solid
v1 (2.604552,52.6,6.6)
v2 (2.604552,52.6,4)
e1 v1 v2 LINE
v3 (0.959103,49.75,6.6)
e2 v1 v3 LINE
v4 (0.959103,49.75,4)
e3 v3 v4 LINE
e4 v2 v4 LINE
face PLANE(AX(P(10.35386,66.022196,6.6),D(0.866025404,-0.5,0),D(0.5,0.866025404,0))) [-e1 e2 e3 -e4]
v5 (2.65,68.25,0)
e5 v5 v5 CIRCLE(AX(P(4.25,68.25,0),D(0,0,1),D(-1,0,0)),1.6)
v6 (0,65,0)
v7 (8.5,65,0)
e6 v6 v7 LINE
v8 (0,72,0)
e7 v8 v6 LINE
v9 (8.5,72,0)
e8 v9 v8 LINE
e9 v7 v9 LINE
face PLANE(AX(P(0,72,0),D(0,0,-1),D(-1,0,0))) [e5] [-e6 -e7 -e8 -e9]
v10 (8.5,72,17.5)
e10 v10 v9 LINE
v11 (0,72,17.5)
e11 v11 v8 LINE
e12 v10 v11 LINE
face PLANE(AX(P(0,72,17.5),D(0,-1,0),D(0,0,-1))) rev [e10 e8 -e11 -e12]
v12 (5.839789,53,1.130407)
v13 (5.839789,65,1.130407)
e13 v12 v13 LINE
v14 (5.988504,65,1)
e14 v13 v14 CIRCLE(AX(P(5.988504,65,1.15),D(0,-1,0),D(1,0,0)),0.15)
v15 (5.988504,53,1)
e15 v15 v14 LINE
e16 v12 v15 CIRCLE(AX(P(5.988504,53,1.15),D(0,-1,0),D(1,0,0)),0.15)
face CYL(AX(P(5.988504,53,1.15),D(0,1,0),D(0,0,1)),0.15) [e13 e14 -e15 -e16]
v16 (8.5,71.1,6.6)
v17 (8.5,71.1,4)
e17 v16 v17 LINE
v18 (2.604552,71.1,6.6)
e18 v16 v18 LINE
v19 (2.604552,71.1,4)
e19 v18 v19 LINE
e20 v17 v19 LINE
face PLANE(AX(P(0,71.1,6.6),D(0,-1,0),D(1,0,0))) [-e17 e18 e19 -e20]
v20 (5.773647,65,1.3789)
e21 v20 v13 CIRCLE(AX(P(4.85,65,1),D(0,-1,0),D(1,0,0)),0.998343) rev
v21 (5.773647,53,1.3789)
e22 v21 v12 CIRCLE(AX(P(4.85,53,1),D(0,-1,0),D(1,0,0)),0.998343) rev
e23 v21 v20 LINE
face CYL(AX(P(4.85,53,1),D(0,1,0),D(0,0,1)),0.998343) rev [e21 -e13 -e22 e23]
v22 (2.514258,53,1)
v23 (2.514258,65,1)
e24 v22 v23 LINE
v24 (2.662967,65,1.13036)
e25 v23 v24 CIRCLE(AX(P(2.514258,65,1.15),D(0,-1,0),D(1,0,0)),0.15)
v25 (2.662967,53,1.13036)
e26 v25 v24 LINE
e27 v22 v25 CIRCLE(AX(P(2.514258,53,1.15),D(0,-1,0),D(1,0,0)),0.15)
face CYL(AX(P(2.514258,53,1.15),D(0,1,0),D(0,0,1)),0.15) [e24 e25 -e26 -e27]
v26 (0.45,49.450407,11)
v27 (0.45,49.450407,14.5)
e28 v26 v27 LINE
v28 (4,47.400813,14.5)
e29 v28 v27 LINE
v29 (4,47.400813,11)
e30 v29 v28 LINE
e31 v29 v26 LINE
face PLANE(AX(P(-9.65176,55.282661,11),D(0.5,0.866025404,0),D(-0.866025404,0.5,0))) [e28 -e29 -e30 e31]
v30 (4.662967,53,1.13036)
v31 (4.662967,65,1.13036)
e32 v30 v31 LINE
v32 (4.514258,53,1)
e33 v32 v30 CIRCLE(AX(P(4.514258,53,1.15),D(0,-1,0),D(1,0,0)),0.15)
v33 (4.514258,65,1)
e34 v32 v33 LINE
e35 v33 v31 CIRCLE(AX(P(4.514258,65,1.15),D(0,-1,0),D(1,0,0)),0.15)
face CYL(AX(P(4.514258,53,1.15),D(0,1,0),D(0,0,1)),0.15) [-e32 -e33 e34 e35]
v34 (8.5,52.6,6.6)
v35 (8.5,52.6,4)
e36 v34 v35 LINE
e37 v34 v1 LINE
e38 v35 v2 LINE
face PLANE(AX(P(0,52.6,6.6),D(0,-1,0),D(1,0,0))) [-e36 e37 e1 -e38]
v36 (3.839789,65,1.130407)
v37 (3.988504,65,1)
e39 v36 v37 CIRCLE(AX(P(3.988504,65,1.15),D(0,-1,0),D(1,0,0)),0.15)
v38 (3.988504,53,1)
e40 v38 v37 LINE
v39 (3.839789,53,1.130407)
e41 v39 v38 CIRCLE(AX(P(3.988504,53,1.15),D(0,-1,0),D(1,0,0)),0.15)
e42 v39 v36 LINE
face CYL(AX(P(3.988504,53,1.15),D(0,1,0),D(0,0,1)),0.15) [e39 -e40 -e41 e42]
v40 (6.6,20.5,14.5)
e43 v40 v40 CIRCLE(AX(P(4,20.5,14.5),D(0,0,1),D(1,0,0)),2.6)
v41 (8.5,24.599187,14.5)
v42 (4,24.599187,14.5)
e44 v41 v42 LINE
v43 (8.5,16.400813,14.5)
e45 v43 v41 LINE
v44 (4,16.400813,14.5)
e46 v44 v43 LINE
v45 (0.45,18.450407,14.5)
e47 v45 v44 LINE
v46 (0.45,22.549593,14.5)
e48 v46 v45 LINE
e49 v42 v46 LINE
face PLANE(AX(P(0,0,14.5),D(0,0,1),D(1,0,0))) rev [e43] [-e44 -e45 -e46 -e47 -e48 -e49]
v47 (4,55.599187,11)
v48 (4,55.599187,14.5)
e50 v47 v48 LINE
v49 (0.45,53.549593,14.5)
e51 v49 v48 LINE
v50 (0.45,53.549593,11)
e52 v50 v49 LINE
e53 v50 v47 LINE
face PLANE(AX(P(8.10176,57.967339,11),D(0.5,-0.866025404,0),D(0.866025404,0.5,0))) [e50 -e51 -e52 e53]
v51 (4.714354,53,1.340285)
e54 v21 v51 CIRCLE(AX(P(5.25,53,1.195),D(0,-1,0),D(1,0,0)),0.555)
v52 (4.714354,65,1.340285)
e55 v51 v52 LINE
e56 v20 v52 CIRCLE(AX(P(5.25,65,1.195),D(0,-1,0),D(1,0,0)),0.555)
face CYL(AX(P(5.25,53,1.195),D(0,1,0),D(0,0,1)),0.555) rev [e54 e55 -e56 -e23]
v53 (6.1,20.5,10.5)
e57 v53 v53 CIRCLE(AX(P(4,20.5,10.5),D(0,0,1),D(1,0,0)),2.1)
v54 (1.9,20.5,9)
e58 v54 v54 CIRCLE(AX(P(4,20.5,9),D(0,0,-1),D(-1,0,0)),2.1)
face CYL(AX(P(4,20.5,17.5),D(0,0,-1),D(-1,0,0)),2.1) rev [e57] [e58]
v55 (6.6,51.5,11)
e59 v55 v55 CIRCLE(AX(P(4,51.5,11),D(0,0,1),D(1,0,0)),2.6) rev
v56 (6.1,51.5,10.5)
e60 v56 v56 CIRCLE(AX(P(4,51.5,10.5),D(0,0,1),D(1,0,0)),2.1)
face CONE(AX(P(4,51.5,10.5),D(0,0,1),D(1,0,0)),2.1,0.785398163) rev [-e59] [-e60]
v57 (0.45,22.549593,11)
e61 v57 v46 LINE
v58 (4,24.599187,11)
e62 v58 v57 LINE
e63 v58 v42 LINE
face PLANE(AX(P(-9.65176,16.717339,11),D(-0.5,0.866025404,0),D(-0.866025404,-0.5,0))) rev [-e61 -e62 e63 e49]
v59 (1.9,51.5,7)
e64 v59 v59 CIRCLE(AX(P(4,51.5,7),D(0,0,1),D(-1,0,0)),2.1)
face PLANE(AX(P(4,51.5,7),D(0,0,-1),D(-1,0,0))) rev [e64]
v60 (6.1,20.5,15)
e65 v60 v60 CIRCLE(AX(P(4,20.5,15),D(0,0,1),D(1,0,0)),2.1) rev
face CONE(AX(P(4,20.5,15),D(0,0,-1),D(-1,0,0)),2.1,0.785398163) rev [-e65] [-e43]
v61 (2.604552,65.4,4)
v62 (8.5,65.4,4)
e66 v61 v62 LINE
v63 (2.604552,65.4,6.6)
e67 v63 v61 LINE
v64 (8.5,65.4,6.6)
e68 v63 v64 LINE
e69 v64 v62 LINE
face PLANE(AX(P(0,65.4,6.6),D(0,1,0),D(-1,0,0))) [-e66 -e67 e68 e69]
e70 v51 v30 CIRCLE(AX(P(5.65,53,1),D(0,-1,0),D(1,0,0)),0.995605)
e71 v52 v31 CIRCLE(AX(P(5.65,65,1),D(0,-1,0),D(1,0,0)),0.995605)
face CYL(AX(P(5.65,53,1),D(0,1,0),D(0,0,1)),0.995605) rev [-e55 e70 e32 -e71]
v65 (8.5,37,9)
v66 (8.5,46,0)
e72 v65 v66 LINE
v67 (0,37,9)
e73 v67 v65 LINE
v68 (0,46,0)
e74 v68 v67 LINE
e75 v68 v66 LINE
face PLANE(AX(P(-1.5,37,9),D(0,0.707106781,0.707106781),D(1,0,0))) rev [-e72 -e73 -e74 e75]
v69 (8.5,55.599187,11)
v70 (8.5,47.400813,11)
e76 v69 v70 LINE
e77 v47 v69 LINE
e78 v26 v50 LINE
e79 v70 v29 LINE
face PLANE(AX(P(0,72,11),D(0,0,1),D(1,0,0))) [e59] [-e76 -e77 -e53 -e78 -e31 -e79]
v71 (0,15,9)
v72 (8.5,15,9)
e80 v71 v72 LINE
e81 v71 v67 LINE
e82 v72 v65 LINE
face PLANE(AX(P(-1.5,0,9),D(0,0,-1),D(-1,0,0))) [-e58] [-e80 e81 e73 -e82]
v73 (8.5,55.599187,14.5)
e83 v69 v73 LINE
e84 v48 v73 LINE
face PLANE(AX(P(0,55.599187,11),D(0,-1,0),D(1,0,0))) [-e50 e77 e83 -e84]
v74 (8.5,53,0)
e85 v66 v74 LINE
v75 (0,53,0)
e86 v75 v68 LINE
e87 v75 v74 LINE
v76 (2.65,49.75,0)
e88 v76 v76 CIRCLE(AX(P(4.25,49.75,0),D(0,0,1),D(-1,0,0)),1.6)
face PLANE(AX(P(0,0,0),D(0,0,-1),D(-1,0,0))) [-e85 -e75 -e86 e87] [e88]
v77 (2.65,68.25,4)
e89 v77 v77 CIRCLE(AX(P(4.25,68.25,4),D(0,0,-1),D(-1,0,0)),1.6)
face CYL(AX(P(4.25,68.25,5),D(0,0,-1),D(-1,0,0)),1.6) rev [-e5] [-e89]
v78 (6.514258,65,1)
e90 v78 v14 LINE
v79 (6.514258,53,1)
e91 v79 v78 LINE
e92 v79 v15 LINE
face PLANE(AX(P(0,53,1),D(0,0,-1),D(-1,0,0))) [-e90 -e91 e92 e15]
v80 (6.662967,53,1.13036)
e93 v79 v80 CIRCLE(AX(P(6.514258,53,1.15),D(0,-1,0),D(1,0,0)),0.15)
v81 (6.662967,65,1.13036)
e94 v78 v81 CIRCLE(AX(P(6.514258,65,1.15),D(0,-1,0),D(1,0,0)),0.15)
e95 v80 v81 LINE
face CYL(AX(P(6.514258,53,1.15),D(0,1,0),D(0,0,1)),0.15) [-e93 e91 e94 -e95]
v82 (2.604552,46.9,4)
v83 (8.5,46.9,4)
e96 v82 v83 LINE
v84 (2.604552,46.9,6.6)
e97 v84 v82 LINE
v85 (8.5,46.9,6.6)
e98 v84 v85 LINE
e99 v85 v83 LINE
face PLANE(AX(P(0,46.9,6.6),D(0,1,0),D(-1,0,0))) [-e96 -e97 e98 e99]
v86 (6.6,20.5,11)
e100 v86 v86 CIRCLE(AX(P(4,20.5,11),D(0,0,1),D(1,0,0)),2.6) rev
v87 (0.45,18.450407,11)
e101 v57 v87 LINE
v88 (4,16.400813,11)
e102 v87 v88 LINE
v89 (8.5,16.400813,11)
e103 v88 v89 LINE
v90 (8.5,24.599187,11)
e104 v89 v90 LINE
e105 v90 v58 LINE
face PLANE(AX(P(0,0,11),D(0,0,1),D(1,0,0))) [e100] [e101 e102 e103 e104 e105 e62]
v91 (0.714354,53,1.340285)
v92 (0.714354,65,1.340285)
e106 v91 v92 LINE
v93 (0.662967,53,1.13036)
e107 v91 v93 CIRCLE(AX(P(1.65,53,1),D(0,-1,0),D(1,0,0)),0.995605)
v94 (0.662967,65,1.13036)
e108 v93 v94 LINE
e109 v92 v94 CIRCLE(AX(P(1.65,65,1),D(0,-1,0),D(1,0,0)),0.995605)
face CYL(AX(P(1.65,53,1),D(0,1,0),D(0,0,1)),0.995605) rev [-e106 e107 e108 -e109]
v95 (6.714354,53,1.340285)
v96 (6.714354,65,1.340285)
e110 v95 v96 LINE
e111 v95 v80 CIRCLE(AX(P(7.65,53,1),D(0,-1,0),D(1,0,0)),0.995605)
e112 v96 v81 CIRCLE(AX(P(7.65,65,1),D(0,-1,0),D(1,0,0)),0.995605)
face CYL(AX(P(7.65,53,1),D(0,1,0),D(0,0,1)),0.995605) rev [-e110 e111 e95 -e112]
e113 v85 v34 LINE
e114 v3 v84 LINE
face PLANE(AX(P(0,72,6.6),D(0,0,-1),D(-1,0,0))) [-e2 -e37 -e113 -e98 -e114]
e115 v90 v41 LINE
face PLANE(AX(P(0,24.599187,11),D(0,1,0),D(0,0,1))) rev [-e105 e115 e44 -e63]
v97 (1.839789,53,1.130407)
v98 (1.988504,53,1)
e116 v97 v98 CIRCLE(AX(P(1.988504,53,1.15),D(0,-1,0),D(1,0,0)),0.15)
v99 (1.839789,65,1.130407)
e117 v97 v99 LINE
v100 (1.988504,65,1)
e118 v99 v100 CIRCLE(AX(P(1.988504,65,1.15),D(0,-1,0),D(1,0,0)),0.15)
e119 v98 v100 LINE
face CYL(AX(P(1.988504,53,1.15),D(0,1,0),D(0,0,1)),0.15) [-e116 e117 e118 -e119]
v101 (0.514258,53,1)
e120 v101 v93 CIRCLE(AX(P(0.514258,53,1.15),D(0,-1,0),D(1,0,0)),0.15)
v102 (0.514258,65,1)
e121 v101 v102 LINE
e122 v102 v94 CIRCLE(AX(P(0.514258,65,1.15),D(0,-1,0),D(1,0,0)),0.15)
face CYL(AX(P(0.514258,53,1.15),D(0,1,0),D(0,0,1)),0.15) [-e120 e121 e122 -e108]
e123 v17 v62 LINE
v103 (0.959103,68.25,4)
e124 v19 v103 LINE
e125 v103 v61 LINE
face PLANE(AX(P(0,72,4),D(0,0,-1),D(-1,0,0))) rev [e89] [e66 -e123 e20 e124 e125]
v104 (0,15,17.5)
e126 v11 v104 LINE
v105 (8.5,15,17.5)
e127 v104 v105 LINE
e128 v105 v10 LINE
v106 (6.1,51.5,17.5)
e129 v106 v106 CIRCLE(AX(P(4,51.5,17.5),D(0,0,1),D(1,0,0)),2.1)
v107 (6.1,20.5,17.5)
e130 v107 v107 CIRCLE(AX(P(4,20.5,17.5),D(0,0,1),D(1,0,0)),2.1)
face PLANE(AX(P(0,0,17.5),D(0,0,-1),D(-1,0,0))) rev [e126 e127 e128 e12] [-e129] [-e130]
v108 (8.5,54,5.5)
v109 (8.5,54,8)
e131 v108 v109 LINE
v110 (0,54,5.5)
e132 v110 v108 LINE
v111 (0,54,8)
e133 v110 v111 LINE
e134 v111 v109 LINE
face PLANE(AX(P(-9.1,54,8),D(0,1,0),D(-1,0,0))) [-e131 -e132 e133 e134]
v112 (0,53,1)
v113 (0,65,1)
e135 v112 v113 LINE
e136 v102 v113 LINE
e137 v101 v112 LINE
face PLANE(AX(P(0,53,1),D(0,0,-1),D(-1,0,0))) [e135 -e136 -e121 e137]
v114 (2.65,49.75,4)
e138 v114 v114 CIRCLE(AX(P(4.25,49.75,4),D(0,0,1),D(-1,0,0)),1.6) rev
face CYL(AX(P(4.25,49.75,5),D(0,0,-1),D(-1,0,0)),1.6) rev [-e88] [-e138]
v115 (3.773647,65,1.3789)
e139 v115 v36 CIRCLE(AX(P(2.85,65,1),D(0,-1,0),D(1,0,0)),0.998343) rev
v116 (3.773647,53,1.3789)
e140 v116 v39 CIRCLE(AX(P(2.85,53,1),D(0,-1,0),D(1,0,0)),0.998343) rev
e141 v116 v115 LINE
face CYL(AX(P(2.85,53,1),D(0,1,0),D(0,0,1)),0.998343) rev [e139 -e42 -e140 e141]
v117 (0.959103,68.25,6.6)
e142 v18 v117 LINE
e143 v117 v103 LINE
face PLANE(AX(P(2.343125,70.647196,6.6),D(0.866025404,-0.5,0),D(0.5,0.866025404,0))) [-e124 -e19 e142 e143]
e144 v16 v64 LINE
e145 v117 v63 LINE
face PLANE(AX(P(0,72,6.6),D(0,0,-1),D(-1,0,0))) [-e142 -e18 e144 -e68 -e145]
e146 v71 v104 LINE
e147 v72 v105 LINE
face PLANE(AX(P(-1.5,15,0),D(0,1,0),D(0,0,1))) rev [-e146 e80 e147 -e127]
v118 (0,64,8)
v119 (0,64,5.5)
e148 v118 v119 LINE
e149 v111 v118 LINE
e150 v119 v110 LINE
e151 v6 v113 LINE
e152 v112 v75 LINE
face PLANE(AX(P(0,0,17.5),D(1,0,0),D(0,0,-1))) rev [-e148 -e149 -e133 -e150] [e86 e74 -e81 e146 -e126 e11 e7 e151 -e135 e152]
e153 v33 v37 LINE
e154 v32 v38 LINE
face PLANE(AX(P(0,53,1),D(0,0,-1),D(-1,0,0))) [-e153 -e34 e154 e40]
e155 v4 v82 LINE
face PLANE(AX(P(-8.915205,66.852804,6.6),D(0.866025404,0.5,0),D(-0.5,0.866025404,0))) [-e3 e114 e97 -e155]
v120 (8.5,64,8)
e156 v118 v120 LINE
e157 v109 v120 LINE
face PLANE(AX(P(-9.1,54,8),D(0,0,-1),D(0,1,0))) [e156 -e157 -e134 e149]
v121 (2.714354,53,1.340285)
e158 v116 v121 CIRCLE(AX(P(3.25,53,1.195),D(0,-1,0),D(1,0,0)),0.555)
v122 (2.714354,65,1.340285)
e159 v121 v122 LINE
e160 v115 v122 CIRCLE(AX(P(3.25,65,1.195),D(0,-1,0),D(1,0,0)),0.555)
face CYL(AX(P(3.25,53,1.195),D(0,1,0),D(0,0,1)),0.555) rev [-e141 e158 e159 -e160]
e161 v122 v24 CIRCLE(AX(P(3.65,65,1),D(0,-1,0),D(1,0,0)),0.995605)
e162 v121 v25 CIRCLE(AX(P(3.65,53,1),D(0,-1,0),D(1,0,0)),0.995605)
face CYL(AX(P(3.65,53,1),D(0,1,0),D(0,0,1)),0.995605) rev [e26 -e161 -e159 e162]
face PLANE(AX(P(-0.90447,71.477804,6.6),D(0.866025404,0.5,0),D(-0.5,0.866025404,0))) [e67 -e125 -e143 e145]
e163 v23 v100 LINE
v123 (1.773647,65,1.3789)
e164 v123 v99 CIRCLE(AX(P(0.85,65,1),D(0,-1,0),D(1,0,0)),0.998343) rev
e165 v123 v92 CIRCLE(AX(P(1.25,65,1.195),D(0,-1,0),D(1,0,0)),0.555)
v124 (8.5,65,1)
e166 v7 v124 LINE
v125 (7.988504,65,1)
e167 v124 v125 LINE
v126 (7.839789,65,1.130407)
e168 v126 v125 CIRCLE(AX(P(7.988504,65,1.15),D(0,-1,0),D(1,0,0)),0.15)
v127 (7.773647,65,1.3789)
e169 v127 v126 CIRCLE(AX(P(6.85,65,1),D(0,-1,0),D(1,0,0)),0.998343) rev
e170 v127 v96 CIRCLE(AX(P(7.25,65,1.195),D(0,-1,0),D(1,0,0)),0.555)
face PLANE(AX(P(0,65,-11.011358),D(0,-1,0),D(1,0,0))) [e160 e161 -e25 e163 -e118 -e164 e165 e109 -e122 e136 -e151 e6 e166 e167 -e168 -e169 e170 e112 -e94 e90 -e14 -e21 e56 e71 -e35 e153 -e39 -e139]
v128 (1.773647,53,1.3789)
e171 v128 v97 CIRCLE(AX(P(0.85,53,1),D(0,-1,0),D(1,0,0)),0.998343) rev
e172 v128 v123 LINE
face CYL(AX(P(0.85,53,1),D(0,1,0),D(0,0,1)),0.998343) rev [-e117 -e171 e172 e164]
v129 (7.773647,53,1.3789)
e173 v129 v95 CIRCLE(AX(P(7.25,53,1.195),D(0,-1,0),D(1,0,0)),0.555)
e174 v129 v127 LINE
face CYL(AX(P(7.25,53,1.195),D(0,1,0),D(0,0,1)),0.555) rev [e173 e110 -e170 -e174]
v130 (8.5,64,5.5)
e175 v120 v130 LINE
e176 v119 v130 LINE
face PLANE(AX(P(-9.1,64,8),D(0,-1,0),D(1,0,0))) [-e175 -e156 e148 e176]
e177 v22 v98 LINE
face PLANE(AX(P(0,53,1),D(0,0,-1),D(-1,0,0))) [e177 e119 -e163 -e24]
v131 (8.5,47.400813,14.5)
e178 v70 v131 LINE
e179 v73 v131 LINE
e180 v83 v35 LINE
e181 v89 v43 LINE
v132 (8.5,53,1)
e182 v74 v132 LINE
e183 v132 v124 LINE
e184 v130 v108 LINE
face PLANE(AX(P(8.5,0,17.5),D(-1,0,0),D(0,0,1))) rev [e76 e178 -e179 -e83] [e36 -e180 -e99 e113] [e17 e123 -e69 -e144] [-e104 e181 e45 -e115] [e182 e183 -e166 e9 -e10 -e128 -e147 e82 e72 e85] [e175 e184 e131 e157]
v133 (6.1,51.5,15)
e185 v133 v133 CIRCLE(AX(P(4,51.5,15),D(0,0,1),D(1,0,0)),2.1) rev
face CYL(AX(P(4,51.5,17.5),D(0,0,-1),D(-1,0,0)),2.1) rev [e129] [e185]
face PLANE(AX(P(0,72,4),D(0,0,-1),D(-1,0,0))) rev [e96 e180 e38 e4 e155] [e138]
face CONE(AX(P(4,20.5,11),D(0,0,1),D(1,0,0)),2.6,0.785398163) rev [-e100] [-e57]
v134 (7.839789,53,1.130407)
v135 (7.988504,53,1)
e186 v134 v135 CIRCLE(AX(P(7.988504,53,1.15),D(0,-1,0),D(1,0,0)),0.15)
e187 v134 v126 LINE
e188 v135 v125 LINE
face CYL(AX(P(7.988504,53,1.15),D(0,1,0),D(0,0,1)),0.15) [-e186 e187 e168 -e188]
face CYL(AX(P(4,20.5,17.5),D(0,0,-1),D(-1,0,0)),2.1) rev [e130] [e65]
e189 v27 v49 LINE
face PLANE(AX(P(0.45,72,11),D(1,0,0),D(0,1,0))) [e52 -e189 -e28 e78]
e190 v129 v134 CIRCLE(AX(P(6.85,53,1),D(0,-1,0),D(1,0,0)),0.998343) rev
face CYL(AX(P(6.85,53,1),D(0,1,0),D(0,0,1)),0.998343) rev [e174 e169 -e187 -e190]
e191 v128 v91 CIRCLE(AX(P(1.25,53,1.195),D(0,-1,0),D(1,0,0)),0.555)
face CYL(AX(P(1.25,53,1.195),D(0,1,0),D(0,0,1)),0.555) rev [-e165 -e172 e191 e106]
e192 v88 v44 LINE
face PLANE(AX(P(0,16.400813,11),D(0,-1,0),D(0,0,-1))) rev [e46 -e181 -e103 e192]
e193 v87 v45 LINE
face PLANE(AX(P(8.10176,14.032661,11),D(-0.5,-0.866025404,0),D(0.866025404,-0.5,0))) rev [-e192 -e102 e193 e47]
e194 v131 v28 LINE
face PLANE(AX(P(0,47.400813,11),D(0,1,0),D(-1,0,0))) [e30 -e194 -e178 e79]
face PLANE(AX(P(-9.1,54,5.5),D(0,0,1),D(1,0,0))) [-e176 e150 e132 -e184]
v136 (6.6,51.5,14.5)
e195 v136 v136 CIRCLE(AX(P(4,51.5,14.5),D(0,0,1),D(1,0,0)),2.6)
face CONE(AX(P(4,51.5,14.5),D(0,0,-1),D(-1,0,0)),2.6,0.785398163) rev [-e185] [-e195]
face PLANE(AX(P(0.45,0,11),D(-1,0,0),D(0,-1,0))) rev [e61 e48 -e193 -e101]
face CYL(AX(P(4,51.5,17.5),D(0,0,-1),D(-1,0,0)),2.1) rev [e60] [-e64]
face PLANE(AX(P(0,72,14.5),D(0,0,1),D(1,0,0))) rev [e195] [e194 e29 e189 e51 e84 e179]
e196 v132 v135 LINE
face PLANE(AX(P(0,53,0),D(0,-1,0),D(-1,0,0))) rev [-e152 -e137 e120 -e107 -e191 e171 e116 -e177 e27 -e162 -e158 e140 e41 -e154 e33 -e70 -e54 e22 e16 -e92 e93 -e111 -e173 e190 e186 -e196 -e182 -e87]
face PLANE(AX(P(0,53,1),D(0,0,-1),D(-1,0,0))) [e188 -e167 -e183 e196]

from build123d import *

# Parameters (mm, degrees)
ESQUISSE1_W              = 8.5
ESQUISSE1_H              = 72
ESQUISSE1_R              = 2.1
BOSS_EXTRU_1_DEPTH       = 17.5
ENL_V_START              = -3
ENL_V_MAT_EXTRU_4_DEPTH  = 3.5
ESQUISSE7_R              = 2.1
BOSS_EXTRU_3_DEPTH       = 7
ESQUISSE3_W              = 8.5
ESQUISSE3_H              = 4
ENL_V_MAT_EXTRU_3_DEPTH  = 19
BOSS_EXTRU_2_START       = -7
BOSS_EXTRU_2_DEPTH       = 12
ESQUISSE8_W              = 8.5
ESQUISSE8_H              = 7
BOSS_EXTRU_4_DEPTH       = 4
ESQUISSE9_R              = 1.6
ENL_V_MAT_EXTRU_5_DEPTH  = 5
ENL_V_START_2            = -4
ESQUISSE10_R             = 1.6
ENL_V_MAT_EXTRU_6_DEPTH  = 2.6
ESQUISSE11_R             = 1.6
ENL_V_MAT_EXTRU_7_DEPTH  = 1.6
ESQUISSE14_W             = 2.5
ESQUISSE14_H             = 10
ENL_V_MAT_EXTRU_9_DEPTH  = 17.6
CHANFREIN1_SIZE          = 0.5
ESQUISSE15_W             = 8.5
ESQUISSE15_H             = 15
ESQUISSE15_W_2           = 2.6
ESQUISSE15_H_2           = 5.7
ESQUISSE15_W_3           = 2.5
ESQUISSE15_H_3           = 10
ENL_V_MAT_EXTRU_10_DEPTH = 10
CHANFREIN2_SIZE          = 9


with BuildPart() as part:
    # Esquisse1 → Boss.-Extru.1 (new body)
    with BuildSketch(Plane.XY):
        with Locations((4.25, 36)):
            Rectangle(ESQUISSE1_W, ESQUISSE1_H)
        with Locations((4, 20.5)):
            Circle(ESQUISSE1_R, mode=Mode.SUBTRACT)
        with Locations((4, 51.5)):
            Circle(ESQUISSE1_R, mode=Mode.SUBTRACT)
    extrude(amount=BOSS_EXTRU_1_DEPTH)

    # Esquisse6 → Enlèv. mat.-Extru.4 (cut)
    with BuildSketch(Plane.XY.offset(17.5).offset(ENL_V_START)):
        Polygon((7.55, 22.549593456), (4, 24.599186911), (0.45, 22.549593456), (0.45, 18.450406544), (4, 16.400813089), (7.55, 18.450406544), align=None)
        Polygon((8.5, 24.599186911), (4, 24.599186911), (7.55, 22.549593456), (7.55, 18.450406544), (4, 16.400813089), (8.5, 16.400813089), align=None)
    enl_v_mat_extru_4 = extrude(amount=-ENL_V_MAT_EXTRU_4_DEPTH, mode=Mode.SUBTRACT)

    # Esquisse7 → Boss.-Extru.3 (add)
    with BuildSketch(Plane(origin=(0, 0, 0), x_dir=(-1, 0, 0), z_dir=(0, 0, -1))):
        with Locations((-4, 20.5)):
            Circle(ESQUISSE7_R)
    boss_extru_3 = extrude(amount=-BOSS_EXTRU_3_DEPTH)

    # Esquisse3 → Enlèv. mat.-Extru.3 (cut)
    with BuildSketch(Plane(origin=(0, 0, 0), x_dir=(-1, 0, 0), z_dir=(0, -1, 0))):
        with Locations((-4.25, -2)):
            Rectangle(ESQUISSE3_W, ESQUISSE3_H)
    enl_v_mat_extru_3 = extrude(amount=-ENL_V_MAT_EXTRU_3_DEPTH, mode=Mode.SUBTRACT)

    # Esquisse5 → Boss.-Extru.2 (add)
    with BuildSketch(Plane.XZ.offset(BOSS_EXTRU_2_START)):
        with BuildLine():
            ThreePointArc((4.662966644, 1.130359715), (4.682946936, 1.236721088), (4.714353535, 1.340285461))
            ThreePointArc((4.714353535, 1.340285461), (5.229781903, 1.749631615), (5.773646598, 1.378900082))
            ThreePointArc((5.773646598, 1.378900082), (5.814751932, 1.256791784), (5.839789089, 1.130406557))
            ThreePointArc((5.839789089, 1.130406557), (5.889607538, 1.037219203), (5.988503907, 1))
            Line((5.988503907, 1), (6.514258005, 1))
            ThreePointArc((6.514258005, 1), (6.613136611, 1.037203629), (6.662966644, 1.130359715))
            ThreePointArc((6.662966644, 1.130359715), (6.682946936, 1.236721088), (6.714353535, 1.340285461))
            ThreePointArc((6.714353535, 1.340285461), (7.229781903, 1.749631615), (7.773646598, 1.378900082))
            ThreePointArc((7.773646598, 1.378900082), (7.814751933, 1.256791779), (7.83978909, 1.130406547))
            ThreePointArc((7.83978909, 1.130406547), (7.889607542, 1.037219199), (7.988503907, 1))
            Line((7.988503907, 1), (8.5, 1))
            Line((8.5, 1), (8.5, 4))
            Line((8.5, 4), (0, 4))
            Line((0, 4), (0, 1))
            Line((0, 1), (0.514258005, 1))
            ThreePointArc((0.514258005, 1), (0.613136611, 1.037203629), (0.662966644, 1.130359715))
            ThreePointArc((0.662966644, 1.130359715), (0.682946936, 1.236721088), (0.714353535, 1.340285461))
            ThreePointArc((0.714353535, 1.340285461), (1.229781903, 1.749631615), (1.773646598, 1.378900082))
            ThreePointArc((1.773646598, 1.378900082), (1.814751933, 1.256791781), (1.83978909, 1.130406551))
            ThreePointArc((1.83978909, 1.130406551), (1.88960754, 1.037219201), (1.988503907, 1))
            Line((1.988503907, 1), (2.514258005, 1))
            ThreePointArc((2.514258005, 1), (2.613136611, 1.037203629), (2.662966644, 1.130359715))
            ThreePointArc((2.662966644, 1.130359715), (2.682946936, 1.236721088), (2.714353535, 1.340285461))
            ThreePointArc((2.714353535, 1.340285461), (3.229781903, 1.749631615), (3.773646598, 1.378900082))
            ThreePointArc((3.773646598, 1.378900082), (3.814751933, 1.256791781), (3.83978909, 1.130406551))
            ThreePointArc((3.83978909, 1.130406551), (3.88960754, 1.037219201), (3.988503907, 1))
            Line((3.988503907, 1), (4.514258005, 1))
            ThreePointArc((4.514258005, 1), (4.613136611, 1.037203629), (4.662966644, 1.130359715))
        make_face()
    boss_extru_2 = extrude(amount=-BOSS_EXTRU_2_DEPTH)

    # Esquisse8 → Boss.-Extru.4 (add)
    with BuildSketch(Plane(origin=(0, 0, 4), x_dir=(-1, 0, 0), z_dir=(0, 0, -1))):
        with Locations((-4.25, 3.5)):
            Rectangle(ESQUISSE8_W, ESQUISSE8_H)
    boss_extru_4 = extrude(amount=BOSS_EXTRU_4_DEPTH)

    # Esquisse9 → Enlèv. mat.-Extru.5 (cut)
    with BuildSketch(Plane(origin=(0, 0, 0), x_dir=(-1, 0, 0), z_dir=(0, 0, -1))):
        with Locations((-4.25, 3.75)):
            Circle(ESQUISSE9_R)
        with Locations((-4.25, 22.25)):
            Circle(ESQUISSE9_R)
    enl_v_mat_extru_5 = extrude(amount=-ENL_V_MAT_EXTRU_5_DEPTH, mode=Mode.SUBTRACT)

    # Esquisse10 → Enlèv. mat.-Extru.6 (cut)
    # profile 1 of 4: a face of its own
    with BuildSketch(Plane(origin=(0, 0, 0), x_dir=(-1, 0, 0), z_dir=(0, 0, -1)).offset(ENL_V_START_2)):
        Polygon((-2.604551733, 25.1), (-5.895448267, 25.1), (-7.540896534, 22.25), (-5.895448267, 19.4), (-2.604551733, 19.4), (-0.959103466, 22.25), align=None)
        with Locations((-4.25, 22.25)):
            Circle(ESQUISSE10_R, mode=Mode.SUBTRACT)
    # profile 2 of 4: a face of its own
    with BuildSketch(Plane(origin=(0, 0, 0), x_dir=(-1, 0, 0), z_dir=(0, 0, -1)).offset(ENL_V_START_2)):
        Polygon((-2.604551733, 6.6), (-5.895448267, 6.6), (-7.540896534, 3.75), (-5.895448267, 0.9), (-2.604551733, 0.9), (-0.959103466, 3.75), align=None)
    # profile 3 of 4: a face of its own
    with BuildSketch(Plane(origin=(0, 0, 0), x_dir=(-1, 0, 0), z_dir=(0, 0, -1)).offset(ENL_V_START_2)):
        Polygon((-8.5, 6.6), (-5.895448267, 6.6), (-7.540896534, 3.75), (-5.895448267, 0.9), (-8.5, 0.9), align=None)
    # profile 4 of 4: a face of its own
    with BuildSketch(Plane(origin=(0, 0, 0), x_dir=(-1, 0, 0), z_dir=(0, 0, -1)).offset(ENL_V_START_2)):
        Polygon((-7.540896534, 22.25), (-5.895448267, 25.1), (-8.5, 25.1), (-8.5, 19.4), (-5.895448267, 19.4), align=None)
    enl_v_mat_extru_6 = extrude(amount=-ENL_V_MAT_EXTRU_6_DEPTH, mode=Mode.SUBTRACT)

    # Esquisse11 → Enlèv. mat.-Extru.7 (cut)
    with BuildSketch(Plane(origin=(0, 0, 5), x_dir=(-1, 0, 0), z_dir=(0, 0, -1))):
        with Locations((-4.25, 22.25)):
            Circle(ESQUISSE11_R)
    enl_v_mat_extru_7 = extrude(amount=-ENL_V_MAT_EXTRU_7_DEPTH, mode=Mode.SUBTRACT)

    # Esquisse14 → Enlèv. mat.-Extru.9 (cut)
    with BuildSketch(Plane(origin=(8.5, 0, 0), x_dir=(0, 0, -1), z_dir=(1, 0, 0))):
        with Locations((-6.75, 13)):
            Rectangle(ESQUISSE14_W, ESQUISSE14_H)
    enl_v_mat_extru_9 = extrude(amount=-ENL_V_MAT_EXTRU_9_DEPTH, mode=Mode.SUBTRACT)

    # Symétrie14: Enlèv. mat.-Extru.4, Boss.-Extru.3, Enlèv. mat.-Extru.3, Boss.-Extru.2, Boss.-Extru.4, Enlèv. mat.-Extru.5, Enlèv. mat.-Extru.6, Enlèv. mat.-Extru.7, Enlèv. mat.-Extru.9 across plane
    add(enl_v_mat_extru_4.mirror(Plane(origin=(0, 36, 0), x_dir=(0, 0, 1), z_dir=(0, -1, 0))), mode=Mode.SUBTRACT)
    add(boss_extru_3.mirror(Plane(origin=(0, 36, 0), x_dir=(0, 0, 1), z_dir=(0, -1, 0))))
    add(enl_v_mat_extru_3.mirror(Plane(origin=(0, 36, 0), x_dir=(0, 0, 1), z_dir=(0, -1, 0))), mode=Mode.SUBTRACT)
    add(boss_extru_2.mirror(Plane(origin=(0, 36, 0), x_dir=(0, 0, 1), z_dir=(0, -1, 0))))
    add(boss_extru_4.mirror(Plane(origin=(0, 36, 0), x_dir=(0, 0, 1), z_dir=(0, -1, 0))))
    add(enl_v_mat_extru_5.mirror(Plane(origin=(0, 36, 0), x_dir=(0, 0, 1), z_dir=(0, -1, 0))), mode=Mode.SUBTRACT)
    add(enl_v_mat_extru_6.mirror(Plane(origin=(0, 36, 0), x_dir=(0, 0, 1), z_dir=(0, -1, 0))), mode=Mode.SUBTRACT)
    add(enl_v_mat_extru_7.mirror(Plane(origin=(0, 36, 0), x_dir=(0, 0, 1), z_dir=(0, -1, 0))), mode=Mode.SUBTRACT)
    add(enl_v_mat_extru_9.mirror(Plane(origin=(0, 36, 0), x_dir=(0, 0, 1), z_dir=(0, -1, 0))), mode=Mode.SUBTRACT)

    # Chanfrein1
    chanfrein1_edges = [part.edges().sort_by_distance(p)[0] for p in [
        (1.9, 51.5, 14.5),
        (1.9, 51.5, 11),
        (1.9, 20.5, 11),
        (1.9, 20.5, 14.5),
    ]]
    chamfer(chanfrein1_edges, length=CHANFREIN1_SIZE)

    # Esquisse15 → Enlèv. mat.-Extru.10 (cut)
    # profile 1 of 2: a face of its own
    with BuildSketch(Plane(origin=(8.5, 0, 0), x_dir=(0, 0, -1), z_dir=(1, 0, 0))):
        with Locations((-13.25, 7.5)):
            Rectangle(ESQUISSE15_W, ESQUISSE15_H)
    # profile 2 of 2: a face of its own
    with BuildSketch(Plane(origin=(8.5, 0, 0), x_dir=(0, 0, -1), z_dir=(1, 0, 0))):
        Polygon((-9, 0), (0, 0), (0, 7), (-1, 7), (-1, 19), (0, 19), (0, 46), (-9, 46), (-9, 15), align=None)
        with Locations((-5.3, 3.75)):
            Rectangle(ESQUISSE15_W_2, ESQUISSE15_H_2, mode=Mode.SUBTRACT)
        with Locations((-6.75, 13)):
            Rectangle(ESQUISSE15_W_3, ESQUISSE15_H_3, mode=Mode.SUBTRACT)
        with Locations((-5.3, 22.25)):
            Rectangle(ESQUISSE15_W_2, ESQUISSE15_H_2, mode=Mode.SUBTRACT)
    extrude(amount=-ENL_V_MAT_EXTRU_10_DEPTH, mode=Mode.SUBTRACT)


with BuildPart() as enl_v_mat_extru_10_kept_piece:
    # of the separate pieces the step leaves, the one the design keeps (enl_v_mat_extru_10_pieces_kept)
    add(part.part.solids().sort_by_distance((6.6, 20.5, 14.5))[0])

    # Chanfrein2
    chanfrein2_edges = [enl_v_mat_extru_10_kept_piece.edges().sort_by_distance(p)[0] for p in [
        (4.25, 46, 9),
    ]]
    chamfer(chanfrein2_edges, length=CHANFREIN2_SIZE - 0.0001)  # a hair under: the kernel refuses the full size


solid = enl_v_mat_extru_10_kept_piece.part
